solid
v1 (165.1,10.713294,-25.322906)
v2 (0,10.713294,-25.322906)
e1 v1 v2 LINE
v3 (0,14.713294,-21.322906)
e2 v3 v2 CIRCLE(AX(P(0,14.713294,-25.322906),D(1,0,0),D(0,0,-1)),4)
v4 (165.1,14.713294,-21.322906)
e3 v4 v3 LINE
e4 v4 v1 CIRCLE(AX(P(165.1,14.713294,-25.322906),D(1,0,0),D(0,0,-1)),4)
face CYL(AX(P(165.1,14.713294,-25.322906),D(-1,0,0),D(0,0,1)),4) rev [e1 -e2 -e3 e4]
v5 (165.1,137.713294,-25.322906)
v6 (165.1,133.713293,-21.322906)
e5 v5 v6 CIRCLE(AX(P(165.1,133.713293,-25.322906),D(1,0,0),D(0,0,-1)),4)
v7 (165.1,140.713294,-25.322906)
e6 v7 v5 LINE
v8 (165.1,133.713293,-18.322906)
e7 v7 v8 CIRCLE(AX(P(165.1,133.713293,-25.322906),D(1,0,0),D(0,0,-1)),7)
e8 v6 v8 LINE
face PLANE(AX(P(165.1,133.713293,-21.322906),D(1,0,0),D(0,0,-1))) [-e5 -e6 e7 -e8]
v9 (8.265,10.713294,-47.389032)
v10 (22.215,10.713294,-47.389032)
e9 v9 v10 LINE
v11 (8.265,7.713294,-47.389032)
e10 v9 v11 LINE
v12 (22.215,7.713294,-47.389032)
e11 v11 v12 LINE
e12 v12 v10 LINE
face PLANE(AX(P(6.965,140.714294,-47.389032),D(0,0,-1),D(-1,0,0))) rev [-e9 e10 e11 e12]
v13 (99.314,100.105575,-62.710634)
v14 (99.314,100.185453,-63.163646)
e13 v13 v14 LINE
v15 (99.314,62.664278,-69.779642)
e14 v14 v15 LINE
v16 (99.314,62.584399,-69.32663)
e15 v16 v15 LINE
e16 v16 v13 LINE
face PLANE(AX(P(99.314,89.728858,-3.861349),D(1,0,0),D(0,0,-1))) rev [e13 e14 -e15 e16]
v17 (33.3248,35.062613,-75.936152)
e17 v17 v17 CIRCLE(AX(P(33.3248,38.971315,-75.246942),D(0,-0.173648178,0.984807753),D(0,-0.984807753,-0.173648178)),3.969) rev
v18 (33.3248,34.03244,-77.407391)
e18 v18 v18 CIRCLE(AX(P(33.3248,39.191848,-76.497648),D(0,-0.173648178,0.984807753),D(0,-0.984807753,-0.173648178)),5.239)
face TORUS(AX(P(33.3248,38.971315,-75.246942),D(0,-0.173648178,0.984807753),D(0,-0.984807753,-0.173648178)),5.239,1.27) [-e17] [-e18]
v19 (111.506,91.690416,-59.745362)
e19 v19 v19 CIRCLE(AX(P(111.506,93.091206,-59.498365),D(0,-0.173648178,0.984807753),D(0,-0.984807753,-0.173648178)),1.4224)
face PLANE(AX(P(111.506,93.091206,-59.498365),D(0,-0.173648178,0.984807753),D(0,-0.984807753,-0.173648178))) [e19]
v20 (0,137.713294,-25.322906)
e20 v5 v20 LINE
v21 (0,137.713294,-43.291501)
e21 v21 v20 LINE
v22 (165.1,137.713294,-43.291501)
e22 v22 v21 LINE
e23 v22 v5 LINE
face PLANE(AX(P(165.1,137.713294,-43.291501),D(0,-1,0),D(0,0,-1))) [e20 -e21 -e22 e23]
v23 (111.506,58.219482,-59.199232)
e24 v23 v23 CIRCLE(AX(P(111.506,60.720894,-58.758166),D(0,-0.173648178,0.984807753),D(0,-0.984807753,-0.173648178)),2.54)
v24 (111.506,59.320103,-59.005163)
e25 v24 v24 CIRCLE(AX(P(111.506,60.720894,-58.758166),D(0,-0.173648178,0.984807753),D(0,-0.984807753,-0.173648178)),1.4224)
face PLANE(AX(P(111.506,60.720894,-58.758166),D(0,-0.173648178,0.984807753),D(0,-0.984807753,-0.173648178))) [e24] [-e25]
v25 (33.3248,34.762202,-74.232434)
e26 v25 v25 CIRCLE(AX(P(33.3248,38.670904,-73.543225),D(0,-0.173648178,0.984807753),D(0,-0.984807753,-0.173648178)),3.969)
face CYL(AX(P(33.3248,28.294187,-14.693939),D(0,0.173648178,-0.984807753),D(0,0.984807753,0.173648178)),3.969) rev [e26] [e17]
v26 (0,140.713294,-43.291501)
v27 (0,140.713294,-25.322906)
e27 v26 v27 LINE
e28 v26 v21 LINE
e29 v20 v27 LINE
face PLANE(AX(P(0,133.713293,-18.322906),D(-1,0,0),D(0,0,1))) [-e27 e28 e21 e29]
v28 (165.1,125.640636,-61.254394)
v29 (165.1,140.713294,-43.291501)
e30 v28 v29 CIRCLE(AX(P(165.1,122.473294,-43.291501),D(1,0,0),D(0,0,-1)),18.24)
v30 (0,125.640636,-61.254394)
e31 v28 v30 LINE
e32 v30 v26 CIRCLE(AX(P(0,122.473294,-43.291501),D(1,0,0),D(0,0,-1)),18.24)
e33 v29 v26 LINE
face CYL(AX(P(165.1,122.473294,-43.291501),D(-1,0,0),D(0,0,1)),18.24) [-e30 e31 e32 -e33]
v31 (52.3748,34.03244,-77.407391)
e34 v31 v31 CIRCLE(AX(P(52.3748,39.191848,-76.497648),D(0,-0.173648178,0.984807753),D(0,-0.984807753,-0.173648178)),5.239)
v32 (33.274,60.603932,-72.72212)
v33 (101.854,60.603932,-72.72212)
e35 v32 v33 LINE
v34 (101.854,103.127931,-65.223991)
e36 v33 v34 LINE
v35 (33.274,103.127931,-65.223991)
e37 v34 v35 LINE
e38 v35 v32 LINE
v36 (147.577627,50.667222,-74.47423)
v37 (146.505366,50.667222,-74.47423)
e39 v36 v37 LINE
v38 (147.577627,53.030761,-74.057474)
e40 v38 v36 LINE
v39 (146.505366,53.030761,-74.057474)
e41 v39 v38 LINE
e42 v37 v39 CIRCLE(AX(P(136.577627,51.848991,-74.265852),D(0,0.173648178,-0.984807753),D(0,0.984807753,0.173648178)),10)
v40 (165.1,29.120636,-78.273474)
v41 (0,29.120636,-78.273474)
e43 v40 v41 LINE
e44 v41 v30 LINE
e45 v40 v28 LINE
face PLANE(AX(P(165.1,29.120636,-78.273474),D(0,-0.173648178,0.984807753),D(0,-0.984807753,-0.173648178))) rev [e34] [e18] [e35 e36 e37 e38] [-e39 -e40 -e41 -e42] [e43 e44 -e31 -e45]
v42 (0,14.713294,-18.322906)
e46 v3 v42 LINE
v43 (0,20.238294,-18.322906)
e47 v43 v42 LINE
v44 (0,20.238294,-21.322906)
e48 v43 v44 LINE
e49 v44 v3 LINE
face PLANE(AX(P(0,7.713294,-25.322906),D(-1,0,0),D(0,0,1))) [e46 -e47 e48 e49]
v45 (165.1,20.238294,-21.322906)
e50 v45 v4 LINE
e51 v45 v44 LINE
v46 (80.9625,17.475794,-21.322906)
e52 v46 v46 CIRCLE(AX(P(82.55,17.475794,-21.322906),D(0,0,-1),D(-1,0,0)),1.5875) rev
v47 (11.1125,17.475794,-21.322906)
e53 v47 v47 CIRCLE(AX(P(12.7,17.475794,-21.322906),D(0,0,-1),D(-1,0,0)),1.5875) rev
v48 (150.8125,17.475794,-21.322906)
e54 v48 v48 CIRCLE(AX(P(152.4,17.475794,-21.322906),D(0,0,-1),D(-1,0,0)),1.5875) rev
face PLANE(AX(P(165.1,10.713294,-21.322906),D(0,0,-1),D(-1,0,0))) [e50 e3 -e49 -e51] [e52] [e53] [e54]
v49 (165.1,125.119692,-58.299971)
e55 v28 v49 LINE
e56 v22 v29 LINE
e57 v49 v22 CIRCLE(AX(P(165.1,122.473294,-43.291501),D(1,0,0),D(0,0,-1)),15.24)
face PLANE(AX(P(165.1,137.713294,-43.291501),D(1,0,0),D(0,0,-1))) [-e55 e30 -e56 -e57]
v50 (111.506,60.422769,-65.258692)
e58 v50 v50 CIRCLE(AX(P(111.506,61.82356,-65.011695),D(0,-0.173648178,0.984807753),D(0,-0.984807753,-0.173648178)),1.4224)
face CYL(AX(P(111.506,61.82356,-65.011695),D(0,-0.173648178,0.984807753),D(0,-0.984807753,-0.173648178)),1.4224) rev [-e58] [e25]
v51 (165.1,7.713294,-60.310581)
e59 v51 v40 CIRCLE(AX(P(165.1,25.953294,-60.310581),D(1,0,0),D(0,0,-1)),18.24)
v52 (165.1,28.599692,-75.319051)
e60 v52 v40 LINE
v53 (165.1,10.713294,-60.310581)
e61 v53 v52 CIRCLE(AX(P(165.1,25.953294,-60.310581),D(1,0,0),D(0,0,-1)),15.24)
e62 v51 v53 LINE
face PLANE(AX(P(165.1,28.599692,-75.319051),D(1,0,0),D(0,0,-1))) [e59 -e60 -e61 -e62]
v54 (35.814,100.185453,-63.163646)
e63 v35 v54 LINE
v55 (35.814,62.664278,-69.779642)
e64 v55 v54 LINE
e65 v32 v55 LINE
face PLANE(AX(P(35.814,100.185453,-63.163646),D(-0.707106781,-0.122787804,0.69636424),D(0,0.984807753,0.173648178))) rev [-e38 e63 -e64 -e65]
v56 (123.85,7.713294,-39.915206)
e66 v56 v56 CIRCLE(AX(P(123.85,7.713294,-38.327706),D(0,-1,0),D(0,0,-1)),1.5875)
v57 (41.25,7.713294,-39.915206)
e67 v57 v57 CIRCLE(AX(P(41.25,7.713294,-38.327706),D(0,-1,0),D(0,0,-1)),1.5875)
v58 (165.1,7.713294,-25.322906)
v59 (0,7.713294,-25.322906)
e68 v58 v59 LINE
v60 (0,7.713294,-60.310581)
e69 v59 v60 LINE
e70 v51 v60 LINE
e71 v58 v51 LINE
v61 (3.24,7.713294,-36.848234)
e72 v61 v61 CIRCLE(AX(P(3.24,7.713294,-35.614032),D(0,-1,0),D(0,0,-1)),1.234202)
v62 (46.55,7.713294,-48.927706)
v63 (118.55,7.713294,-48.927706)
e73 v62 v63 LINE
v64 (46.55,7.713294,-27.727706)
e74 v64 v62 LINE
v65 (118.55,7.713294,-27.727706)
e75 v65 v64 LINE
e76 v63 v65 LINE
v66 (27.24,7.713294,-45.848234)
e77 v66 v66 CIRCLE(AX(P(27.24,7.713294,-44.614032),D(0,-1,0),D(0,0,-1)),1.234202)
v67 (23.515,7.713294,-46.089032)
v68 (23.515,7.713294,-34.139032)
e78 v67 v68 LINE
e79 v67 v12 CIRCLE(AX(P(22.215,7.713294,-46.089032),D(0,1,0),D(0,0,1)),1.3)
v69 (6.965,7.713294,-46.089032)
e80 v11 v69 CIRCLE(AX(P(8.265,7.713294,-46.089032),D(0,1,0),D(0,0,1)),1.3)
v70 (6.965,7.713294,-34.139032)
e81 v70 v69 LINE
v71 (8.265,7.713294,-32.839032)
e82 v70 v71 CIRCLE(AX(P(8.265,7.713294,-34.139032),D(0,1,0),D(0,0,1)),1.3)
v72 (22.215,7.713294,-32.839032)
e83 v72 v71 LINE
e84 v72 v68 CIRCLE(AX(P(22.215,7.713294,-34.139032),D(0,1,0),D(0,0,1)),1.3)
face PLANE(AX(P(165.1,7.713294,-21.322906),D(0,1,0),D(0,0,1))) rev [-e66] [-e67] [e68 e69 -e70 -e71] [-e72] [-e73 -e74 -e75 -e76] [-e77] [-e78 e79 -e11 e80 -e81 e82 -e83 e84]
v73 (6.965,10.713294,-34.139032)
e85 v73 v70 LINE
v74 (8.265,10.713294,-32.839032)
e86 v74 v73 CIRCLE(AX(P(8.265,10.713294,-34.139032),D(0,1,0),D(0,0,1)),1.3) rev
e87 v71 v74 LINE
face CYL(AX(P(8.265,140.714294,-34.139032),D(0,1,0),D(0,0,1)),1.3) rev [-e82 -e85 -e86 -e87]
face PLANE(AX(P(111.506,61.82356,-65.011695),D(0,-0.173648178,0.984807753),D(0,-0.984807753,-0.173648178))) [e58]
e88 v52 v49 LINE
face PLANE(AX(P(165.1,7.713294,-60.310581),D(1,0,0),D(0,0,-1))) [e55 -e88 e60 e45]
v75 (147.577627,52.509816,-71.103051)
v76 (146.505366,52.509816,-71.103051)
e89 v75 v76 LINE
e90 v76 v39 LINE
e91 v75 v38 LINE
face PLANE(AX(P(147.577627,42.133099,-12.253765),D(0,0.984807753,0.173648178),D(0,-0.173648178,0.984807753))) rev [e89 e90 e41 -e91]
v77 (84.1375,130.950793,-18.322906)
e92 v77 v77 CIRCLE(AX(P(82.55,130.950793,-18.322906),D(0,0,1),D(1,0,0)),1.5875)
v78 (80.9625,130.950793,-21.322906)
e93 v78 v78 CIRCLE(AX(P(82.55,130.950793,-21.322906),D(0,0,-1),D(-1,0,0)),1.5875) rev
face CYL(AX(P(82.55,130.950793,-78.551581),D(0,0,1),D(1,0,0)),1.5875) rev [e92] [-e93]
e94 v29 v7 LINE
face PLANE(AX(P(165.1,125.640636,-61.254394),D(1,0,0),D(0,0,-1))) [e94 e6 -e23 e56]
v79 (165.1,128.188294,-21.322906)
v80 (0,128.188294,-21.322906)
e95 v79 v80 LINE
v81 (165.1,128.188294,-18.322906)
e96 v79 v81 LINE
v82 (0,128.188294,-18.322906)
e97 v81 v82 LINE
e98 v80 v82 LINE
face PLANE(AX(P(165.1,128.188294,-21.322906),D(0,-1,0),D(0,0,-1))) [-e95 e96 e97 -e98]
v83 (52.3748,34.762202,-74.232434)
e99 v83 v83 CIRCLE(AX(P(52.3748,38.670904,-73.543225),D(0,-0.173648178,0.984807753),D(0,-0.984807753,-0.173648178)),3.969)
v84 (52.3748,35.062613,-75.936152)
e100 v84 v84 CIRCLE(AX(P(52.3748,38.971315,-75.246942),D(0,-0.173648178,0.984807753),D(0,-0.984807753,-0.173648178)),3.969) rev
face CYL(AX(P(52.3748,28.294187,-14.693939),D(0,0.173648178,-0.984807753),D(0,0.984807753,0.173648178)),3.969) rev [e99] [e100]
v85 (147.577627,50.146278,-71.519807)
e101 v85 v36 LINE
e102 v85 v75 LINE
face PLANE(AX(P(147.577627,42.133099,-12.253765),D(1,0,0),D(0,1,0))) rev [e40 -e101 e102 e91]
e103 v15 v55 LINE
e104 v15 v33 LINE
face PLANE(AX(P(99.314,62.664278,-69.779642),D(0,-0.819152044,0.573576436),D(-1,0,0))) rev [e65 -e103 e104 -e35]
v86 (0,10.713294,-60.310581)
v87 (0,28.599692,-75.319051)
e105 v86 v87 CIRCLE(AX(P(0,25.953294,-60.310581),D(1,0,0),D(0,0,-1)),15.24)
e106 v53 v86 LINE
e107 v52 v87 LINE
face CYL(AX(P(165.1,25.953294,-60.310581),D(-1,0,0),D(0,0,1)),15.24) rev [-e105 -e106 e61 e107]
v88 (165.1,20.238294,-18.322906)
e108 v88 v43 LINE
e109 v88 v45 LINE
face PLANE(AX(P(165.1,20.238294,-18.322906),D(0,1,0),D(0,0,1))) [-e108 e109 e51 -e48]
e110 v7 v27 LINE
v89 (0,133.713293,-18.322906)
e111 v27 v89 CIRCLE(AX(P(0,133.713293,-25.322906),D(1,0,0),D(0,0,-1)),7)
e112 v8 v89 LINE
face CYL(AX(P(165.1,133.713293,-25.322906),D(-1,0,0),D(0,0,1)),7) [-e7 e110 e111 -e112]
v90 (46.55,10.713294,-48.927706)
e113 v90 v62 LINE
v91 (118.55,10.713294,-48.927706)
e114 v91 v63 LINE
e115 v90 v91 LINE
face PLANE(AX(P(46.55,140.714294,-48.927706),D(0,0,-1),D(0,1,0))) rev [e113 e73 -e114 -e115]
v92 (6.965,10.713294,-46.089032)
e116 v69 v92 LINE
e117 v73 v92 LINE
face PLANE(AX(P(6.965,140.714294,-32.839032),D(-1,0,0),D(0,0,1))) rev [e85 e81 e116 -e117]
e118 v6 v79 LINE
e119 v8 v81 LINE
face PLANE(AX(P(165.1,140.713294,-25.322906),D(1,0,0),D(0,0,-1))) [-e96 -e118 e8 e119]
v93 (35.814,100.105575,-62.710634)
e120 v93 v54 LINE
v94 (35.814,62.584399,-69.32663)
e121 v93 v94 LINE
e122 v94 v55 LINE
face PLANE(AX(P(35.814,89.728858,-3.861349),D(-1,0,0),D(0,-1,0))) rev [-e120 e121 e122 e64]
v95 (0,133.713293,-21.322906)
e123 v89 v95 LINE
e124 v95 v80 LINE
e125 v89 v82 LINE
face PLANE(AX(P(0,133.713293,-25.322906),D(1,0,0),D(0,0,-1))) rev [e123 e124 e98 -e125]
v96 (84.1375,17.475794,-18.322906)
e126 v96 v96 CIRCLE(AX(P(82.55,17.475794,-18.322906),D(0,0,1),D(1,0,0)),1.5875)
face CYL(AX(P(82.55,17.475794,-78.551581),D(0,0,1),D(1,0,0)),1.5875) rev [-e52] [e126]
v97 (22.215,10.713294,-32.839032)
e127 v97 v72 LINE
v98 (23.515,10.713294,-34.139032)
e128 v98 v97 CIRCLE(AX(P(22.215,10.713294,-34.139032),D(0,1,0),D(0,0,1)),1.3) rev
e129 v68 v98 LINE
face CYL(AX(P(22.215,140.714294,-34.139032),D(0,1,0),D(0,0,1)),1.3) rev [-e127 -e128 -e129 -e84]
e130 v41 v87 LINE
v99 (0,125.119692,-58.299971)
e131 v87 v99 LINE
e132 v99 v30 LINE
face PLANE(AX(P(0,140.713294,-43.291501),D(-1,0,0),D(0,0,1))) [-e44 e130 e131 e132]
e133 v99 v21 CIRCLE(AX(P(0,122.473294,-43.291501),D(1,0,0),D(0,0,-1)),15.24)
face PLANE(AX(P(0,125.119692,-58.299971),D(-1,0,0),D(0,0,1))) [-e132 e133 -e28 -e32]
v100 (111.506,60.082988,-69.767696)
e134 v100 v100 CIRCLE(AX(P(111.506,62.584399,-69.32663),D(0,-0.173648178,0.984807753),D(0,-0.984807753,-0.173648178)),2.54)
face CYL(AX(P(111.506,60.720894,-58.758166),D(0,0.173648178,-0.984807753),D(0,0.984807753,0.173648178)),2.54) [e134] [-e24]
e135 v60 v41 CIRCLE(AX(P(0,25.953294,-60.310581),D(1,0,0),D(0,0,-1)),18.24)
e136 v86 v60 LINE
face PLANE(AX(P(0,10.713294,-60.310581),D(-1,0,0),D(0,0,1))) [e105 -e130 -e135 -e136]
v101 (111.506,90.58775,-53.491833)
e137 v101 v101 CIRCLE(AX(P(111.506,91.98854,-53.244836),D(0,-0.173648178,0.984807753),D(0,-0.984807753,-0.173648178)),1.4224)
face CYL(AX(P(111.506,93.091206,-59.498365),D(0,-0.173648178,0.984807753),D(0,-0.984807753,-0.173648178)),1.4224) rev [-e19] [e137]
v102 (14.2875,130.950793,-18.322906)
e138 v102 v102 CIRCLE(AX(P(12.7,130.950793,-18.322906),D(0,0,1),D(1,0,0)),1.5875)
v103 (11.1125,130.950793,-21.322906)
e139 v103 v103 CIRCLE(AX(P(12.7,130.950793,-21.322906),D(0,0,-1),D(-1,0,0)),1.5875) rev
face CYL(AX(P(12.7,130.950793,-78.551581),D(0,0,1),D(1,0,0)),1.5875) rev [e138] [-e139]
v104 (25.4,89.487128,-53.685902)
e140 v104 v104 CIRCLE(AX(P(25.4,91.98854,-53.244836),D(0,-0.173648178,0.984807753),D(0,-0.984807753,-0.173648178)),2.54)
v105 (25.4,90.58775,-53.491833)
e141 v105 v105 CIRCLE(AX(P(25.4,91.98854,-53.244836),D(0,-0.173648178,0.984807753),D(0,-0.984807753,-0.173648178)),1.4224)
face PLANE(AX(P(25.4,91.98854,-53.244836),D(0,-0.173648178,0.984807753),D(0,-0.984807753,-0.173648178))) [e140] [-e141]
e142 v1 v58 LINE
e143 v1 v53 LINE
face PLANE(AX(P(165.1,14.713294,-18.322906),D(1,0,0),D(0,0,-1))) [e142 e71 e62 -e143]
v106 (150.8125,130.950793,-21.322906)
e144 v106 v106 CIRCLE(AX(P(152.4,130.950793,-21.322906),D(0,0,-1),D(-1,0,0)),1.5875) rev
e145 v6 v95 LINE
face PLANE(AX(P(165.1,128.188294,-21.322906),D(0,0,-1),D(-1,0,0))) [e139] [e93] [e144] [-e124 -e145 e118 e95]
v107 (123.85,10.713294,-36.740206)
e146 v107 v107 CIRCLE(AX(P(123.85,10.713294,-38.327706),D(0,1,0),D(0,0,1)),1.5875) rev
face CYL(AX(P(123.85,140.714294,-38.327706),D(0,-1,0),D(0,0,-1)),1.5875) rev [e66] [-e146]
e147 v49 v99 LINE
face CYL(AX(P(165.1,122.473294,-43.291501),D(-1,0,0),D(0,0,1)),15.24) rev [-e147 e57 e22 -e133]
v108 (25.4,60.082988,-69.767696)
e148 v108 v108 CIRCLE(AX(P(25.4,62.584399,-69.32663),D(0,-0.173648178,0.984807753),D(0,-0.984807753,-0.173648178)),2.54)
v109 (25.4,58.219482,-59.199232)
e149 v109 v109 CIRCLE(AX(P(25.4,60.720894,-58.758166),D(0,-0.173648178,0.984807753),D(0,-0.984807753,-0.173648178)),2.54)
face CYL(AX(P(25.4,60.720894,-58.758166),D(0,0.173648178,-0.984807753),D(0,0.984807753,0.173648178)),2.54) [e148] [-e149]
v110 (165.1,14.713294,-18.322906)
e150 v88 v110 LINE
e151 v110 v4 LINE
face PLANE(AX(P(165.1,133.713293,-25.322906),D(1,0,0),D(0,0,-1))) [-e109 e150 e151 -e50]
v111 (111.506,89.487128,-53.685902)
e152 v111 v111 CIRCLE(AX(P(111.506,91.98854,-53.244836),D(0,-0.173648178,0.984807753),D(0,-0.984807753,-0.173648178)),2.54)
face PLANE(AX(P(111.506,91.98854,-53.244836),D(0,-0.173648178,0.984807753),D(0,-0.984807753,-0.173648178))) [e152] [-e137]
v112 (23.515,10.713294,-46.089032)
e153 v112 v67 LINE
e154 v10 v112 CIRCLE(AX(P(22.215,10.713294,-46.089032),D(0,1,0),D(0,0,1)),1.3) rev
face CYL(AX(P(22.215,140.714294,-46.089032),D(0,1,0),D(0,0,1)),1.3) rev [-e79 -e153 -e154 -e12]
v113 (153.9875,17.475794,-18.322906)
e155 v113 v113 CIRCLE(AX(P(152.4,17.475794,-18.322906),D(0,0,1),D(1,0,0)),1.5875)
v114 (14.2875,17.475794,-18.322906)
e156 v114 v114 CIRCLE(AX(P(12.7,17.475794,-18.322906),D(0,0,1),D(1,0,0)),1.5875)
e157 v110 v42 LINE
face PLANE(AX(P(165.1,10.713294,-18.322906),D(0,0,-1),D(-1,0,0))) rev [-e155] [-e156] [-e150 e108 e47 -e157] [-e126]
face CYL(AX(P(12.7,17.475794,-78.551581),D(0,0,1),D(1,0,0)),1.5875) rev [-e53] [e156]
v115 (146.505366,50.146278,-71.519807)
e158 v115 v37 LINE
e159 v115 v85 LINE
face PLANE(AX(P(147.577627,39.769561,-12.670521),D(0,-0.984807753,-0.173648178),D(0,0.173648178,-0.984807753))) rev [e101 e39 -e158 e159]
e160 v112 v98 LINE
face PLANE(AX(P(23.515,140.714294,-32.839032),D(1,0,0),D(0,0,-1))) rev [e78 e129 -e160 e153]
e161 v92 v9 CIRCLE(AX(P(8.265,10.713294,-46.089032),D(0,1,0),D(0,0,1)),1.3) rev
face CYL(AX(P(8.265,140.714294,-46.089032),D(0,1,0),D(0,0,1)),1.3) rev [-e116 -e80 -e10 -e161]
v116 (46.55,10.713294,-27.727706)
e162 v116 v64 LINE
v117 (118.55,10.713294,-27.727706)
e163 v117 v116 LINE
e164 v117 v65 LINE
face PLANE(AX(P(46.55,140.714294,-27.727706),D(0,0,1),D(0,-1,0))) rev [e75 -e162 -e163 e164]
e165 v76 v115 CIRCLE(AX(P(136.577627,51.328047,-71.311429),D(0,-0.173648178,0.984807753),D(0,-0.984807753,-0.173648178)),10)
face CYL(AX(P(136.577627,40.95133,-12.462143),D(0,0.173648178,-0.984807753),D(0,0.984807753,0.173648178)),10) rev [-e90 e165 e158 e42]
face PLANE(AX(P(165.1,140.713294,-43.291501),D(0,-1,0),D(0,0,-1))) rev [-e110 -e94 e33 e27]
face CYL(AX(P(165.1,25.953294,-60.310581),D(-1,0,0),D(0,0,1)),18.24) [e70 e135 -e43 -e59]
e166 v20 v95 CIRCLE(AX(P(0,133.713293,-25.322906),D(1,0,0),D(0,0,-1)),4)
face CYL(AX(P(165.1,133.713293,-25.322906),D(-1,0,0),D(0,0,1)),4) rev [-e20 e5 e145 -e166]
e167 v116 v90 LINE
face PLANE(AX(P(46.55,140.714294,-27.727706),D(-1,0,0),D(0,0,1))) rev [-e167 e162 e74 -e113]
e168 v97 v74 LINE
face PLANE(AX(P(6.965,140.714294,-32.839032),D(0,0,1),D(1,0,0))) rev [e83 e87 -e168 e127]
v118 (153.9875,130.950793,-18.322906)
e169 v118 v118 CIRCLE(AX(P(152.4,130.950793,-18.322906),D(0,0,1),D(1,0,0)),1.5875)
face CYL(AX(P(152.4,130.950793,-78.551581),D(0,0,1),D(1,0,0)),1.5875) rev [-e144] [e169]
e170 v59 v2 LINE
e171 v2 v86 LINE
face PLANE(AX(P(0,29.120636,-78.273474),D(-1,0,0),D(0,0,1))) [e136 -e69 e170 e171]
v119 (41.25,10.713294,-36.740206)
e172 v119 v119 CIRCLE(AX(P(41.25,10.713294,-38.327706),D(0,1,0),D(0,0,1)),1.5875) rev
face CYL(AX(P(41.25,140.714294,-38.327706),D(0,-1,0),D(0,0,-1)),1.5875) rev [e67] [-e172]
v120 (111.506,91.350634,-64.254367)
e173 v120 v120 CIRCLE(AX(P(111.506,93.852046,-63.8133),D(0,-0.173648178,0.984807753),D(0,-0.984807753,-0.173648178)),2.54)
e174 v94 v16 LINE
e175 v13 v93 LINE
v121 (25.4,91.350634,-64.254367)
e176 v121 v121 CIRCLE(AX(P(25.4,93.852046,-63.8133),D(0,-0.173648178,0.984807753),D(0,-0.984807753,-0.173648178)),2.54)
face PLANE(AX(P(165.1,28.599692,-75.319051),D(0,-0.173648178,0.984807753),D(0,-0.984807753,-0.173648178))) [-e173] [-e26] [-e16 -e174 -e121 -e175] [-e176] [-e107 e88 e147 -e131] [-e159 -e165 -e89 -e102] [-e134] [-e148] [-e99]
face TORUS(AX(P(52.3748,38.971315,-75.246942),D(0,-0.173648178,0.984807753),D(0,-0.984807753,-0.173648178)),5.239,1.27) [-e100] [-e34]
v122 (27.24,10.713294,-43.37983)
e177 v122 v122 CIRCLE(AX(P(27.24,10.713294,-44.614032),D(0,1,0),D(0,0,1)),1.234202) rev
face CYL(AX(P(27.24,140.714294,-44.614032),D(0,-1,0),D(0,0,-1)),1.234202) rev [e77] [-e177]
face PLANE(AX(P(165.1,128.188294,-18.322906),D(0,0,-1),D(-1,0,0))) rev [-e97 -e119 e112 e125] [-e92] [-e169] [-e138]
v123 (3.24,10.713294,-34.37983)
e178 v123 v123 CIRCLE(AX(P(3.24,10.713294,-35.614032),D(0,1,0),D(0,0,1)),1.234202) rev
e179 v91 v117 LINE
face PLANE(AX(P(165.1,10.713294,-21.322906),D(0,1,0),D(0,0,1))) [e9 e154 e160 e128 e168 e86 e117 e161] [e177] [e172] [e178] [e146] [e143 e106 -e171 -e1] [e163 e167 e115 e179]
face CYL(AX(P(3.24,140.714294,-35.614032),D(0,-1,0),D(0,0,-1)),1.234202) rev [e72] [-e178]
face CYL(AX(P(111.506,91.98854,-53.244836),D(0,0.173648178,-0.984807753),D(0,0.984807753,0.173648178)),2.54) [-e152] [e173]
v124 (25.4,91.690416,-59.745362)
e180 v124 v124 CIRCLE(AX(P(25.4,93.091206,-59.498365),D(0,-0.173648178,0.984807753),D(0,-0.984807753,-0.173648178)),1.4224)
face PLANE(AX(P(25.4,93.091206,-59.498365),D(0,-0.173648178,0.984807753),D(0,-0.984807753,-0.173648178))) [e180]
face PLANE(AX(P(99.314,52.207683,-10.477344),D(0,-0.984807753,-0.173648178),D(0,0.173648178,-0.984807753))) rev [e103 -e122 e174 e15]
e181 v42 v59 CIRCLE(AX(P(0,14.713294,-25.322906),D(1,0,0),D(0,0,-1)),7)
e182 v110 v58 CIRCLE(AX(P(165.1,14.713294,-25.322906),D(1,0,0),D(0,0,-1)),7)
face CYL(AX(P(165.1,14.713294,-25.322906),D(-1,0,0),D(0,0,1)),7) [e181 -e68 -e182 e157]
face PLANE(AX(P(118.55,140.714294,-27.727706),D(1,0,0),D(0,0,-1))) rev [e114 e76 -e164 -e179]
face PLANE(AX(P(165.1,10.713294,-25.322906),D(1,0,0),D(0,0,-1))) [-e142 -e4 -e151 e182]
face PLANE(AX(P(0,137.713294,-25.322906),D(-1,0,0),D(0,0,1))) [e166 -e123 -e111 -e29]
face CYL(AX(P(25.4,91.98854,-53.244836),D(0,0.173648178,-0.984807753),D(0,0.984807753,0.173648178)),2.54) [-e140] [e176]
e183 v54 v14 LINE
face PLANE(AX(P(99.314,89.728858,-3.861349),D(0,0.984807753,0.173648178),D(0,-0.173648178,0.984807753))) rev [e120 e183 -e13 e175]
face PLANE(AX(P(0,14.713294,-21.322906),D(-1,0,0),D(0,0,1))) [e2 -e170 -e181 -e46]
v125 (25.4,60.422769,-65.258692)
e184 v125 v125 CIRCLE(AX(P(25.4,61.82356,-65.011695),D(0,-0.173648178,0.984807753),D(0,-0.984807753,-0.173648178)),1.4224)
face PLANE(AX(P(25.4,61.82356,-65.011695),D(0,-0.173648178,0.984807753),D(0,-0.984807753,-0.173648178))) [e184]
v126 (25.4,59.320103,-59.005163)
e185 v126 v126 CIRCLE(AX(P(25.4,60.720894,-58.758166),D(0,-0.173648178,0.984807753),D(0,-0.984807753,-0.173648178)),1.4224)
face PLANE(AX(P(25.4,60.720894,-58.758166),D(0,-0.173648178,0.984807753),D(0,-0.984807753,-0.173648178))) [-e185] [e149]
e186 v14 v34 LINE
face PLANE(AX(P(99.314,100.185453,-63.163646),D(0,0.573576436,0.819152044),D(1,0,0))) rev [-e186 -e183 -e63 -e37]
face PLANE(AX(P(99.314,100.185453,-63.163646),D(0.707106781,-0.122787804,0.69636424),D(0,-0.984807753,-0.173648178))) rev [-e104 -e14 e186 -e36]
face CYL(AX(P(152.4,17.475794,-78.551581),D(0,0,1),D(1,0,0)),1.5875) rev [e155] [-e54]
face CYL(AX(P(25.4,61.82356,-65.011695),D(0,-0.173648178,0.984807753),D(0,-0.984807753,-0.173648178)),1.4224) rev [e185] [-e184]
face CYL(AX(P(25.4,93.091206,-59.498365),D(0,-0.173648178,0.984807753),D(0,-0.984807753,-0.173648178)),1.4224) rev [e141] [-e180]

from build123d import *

# Parameters (mm, degrees)
BASE_FLANGE1_DEPTH   = 165.1
SKETCH6_W            = 63.5
SKETCH6_H            = 38.1
CUT_EXTRUDE1_DEPTH   = 218.169427211
CHAMFER1_SIZE        = 2.54
SKETCH8_R            = 2.54
BOSS_EXTRUDE1_DEPTH  = 10.7315
LPATTERN1_COUNT      = 2
LPATTERN1_PITCH      = 31.75
LPATTERN1_COUNT_DIR2 = 2
LPATTERN1_PITCH_DIR2 = 86.106
SKETCH9_R            = 3.969000063
CUT_EXTRUDE2_DEPTH   = 218.169427211
LPATTERN2_COUNT      = 2
LPATTERN2_PITCH      = 19.05
CUT_EXTRUDE3_DEPTH   = 218.169427211
CUT_EXTRUDE5_REACH   = 228.091
SKETCH11_R           = 1.5875
SKETCH11_W           = 72
SKETCH11_H           = 21.2
SKETCH12_R           = 1.5875
CUT_EXTRUDE6_DEPTH   = 3
SKETCH13_R           = 1.234202105
SKETCH13_W           = 16.55
SKETCH13_H           = 14.55
CUT_EXTRUDE7_DEPTH   = 3
FILLET1_R            = 1.3
FILLET2_R            = 1.27
SKETCH14_R           = 1.4224
CUT_EXTRUDE8_DEPTH   = 6.35


# Sheet-metal steps are written as plain solids
with BuildPart() as part:
    # Sketch1 → Base-Flange1 (new body)
    with BuildSketch(Plane(origin=(0, 0, 0), x_dir=(0, 0, -1), z_dir=(1, 0, 0))):
        with BuildLine():
            Line((21.322905549, 20.238293522), (21.322905549, 14.71329365))
            ThreePointArc((21.322905549, 14.71329365), (22.494478461, 11.884866435), (25.322905677, 10.713293522))
            Line((25.322905677, 10.713293522), (60.310580797, 10.713293522))
            ThreePointArc((60.310580797, 10.713293522), (71.985098111, 16.15721035), (75.319050953, 28.59969175))
            Line((75.319050953, 28.59969175), (58.299970775, 125.11969175))
            ThreePointArc((58.299970775, 125.11969175), (53.087583791, 134.147810835), (43.291500619, 137.713293522))
            Line((43.291500619, 137.713293522), (25.322905677, 137.713293522))
            ThreePointArc((25.322905677, 137.713293522), (22.494478461, 136.541720609), (21.322905549, 133.713293394))
            Line((21.322905549, 133.713293394), (21.322905549, 128.188293522))
            Line((21.322905549, 128.188293522), (18.322905549, 128.188293522))
            Line((18.322905549, 128.188293522), (18.322905549, 133.713293394))
            ThreePointArc((18.322905549, 133.713293394), (20.373158118, 138.663040953), (25.322905677, 140.713293522))
            Line((25.322905677, 140.713293522), (43.291500619, 140.713293522))
            ThreePointArc((43.291500619, 140.713293522), (55.01594662, 136.445944164), (61.254394034, 125.640636283))
            Line((61.254394034, 125.640636283), (78.273474212, 29.120636283))
            ThreePointArc((78.273474212, 29.120636283), (74.28323144, 14.228847521), (60.310580797, 7.713293522))
            Line((60.310580797, 7.713293522), (25.322905677, 7.713293522))
            ThreePointArc((25.322905677, 7.713293522), (20.373158118, 9.763546091), (18.322905549, 14.71329365))
            Line((18.322905549, 14.71329365), (18.322905549, 20.238293522))
            Line((18.322905549, 20.238293522), (21.322905549, 20.238293522))
        make_face()
    extrude(amount=BASE_FLANGE1_DEPTH)

    # Sketch6 → Cut-Extrude1 (cut, through all)
    with BuildSketch(Plane(origin=(0, 14.263647062, -80.893162264), x_dir=(-1, 0, 0), z_dir=(0, 0.1736481776669347, -0.9848077530122075))):
        with Locations((-67.564, 68.645158806)):
            Rectangle(SKETCH6_W, SKETCH6_H)
    extrude(amount=-CUT_EXTRUDE1_DEPTH, mode=Mode.SUBTRACT)

    # Chamfer1
    chamfer1_edges = [part.edges().sort_by_distance(p)[0] for p in [
        (99.314, 81.865931661, -68.973055532),
        (67.564, 63.105343966, -72.281053316),
        (35.814, 81.865931661, -68.973055532),
        (67.564, 100.626519356, -65.665057747),
    ]]
    chamfer(chamfer1_edges, length=CHAMFER1_SIZE)

    # Sketch8 → Boss-Extrude1 (add)
    with BuildSketch(Plane(origin=(0, 13.742702529, -77.938739005), x_dir=(1, 0, 0), z_dir=(0, -0.1736481776669347, 0.9848077530122075))):
        with Locations(Location((25.4, 49.595158806, 0), (0, 0, 270))):
            Circle(SKETCH8_R)
    boss_extrude1 = extrude(amount=BOSS_EXTRUDE1_DEPTH)

    # LPattern1: Boss-Extrude1 2 × 2
    with Locations(*[Vector(0, 0.9848077530122074, 0.17364817766693458) * (i * LPATTERN1_PITCH) + Vector(1, 0, 0) * (j * LPATTERN1_PITCH_DIR2) for i in range(LPATTERN1_COUNT) for j in range(LPATTERN1_COUNT_DIR2) if (i, j) != (0, 0)]):
        add(boss_extrude1)

    # Sketch9 → Cut-Extrude2 (cut, through all)
    with BuildSketch(Plane(origin=(0, 14.263647062, -80.893162264), x_dir=(-1, 0, 0), z_dir=(0, 0.1736481776669347, -0.9848077530122075))):
        with Locations(Location((-52.3748, 25.312758806, 0), (0, 0, 90))):
            Circle(SKETCH9_R)
    cut_extrude2 = extrude(amount=-CUT_EXTRUDE2_DEPTH, mode=Mode.SUBTRACT)

    # LPattern2: Cut-Extrude2 ×2
    with Locations(*[(-i * LPATTERN2_PITCH, 0, 0) for i in range(1, LPATTERN2_COUNT)]):
        add(cut_extrude2, mode=Mode.SUBTRACT)

    # Sketch10 → Cut-Extrude3 (cut, through all)
    with BuildSketch(Plane(origin=(0, 14.263647062, -80.893162264), x_dir=(-1, 0, 0), z_dir=(0, 0.17364817766693483, -0.9848077530122072))):
        with BuildLine():
            Line((-147.577626964, 39.365158806), (-147.577626964, 36.965158806))
            Line((-147.577626964, 36.965158806), (-146.505365759, 36.965158806))
            ThreePointArc((-146.505365759, 36.965158806), (-126.577626964, 38.165158806), (-146.505365759, 39.365158806))
            Line((-146.505365759, 39.365158806), (-147.577626964, 39.365158806))
        make_face()
    extrude(amount=-CUT_EXTRUDE3_DEPTH, mode=Mode.SUBTRACT)

    # Sketch11 → Cut-Extrude5 (cut, up to next)
    with BuildSketch(Plane(origin=(0, 7.713293522, 0), x_dir=(-1, 0, 0), z_dir=(0, -1, 0)), mode=Mode.PRIVATE) as cut_extrude5_sk1:
        with Locations(Location((-41.25, 38.327705677, 0), (0, 0, 90))):
            Circle(SKETCH11_R)
    cut_extrude5_tool1 = extrude(cut_extrude5_sk1.sketch, amount=-CUT_EXTRUDE5_REACH, mode=Mode.PRIVATE) & part.part
    # Sketch11 → Cut-Extrude5 (cut, up to next)
    with BuildSketch(Plane(origin=(0, 7.713293522, 0), x_dir=(-1, 0, 0), z_dir=(0, -1, 0)), mode=Mode.PRIVATE) as cut_extrude5_sk2:
        with Locations(Location((-123.85, 38.327705677, 0), (0, 0, 90))):
            Circle(SKETCH11_R)
    cut_extrude5_tool2 = extrude(cut_extrude5_sk2.sketch, amount=-CUT_EXTRUDE5_REACH, mode=Mode.PRIVATE) & part.part
    # Sketch11 → Cut-Extrude5 (cut, up to next)
    with BuildSketch(Plane(origin=(0, 7.713293522, 0), x_dir=(-1, 0, 0), z_dir=(0, -1, 0)), mode=Mode.PRIVATE) as cut_extrude5_sk3:
        with Locations((-82.55, 38.327705677)):
            Rectangle(SKETCH11_W, SKETCH11_H)
    cut_extrude5_tool3 = extrude(cut_extrude5_sk3.sketch, amount=-CUT_EXTRUDE5_REACH, mode=Mode.PRIVATE) & part.part
    add(cut_extrude5_tool1.solids().sort_by_distance((41.25, 7.713294, -38.327706))[0], mode=Mode.SUBTRACT)
    add(cut_extrude5_tool2.solids().sort_by_distance((123.85, 7.713294, -38.327706))[0], mode=Mode.SUBTRACT)
    add(cut_extrude5_tool3.solids().sort_by_distance((82.55, 7.713294, -38.327706))[0], mode=Mode.SUBTRACT)

    # Sketch12 → Cut-Extrude6 (cut)
    with BuildSketch(Plane.XY.offset(-18.322905549)):
        with Locations((152.4, 130.950793458)):
            Circle(SKETCH12_R)
        with Locations((152.4, 17.475793586)):
            Circle(SKETCH12_R)
        with Locations((82.55, 17.475793586)):
            Circle(SKETCH12_R)
        with Locations((82.55, 130.950793458)):
            Circle(SKETCH12_R)
        with Locations((12.7, 130.950793458)):
            Circle(SKETCH12_R)
        with Locations((12.7, 17.475793586)):
            Circle(SKETCH12_R)
    extrude(amount=-CUT_EXTRUDE6_DEPTH, mode=Mode.SUBTRACT)

    # Sketch13 → Cut-Extrude7 (cut)
    with BuildSketch(Plane(origin=(0, 7.713293522, 0), x_dir=(-1, 0, 0), z_dir=(0, -1, 0))):
        with Locations(Location((-3.24, 35.61403221, 0), (0, 0, 90))):
            Circle(SKETCH13_R)
        with Locations(Location((-27.24, 44.61403221, 0), (0, 0, 90))):
            Circle(SKETCH13_R)
        with Locations((-15.24, 40.11403221)):
            Rectangle(SKETCH13_W, SKETCH13_H)
    extrude(amount=-CUT_EXTRUDE7_DEPTH, mode=Mode.SUBTRACT)

    # Fillet1
    fillet1_edges = [part.edges().sort_by_distance(p)[0] for p in [
        (6.965, 9.213293522, -47.38903221),
        (6.965, 9.213293522, -32.83903221),
        (23.515, 9.213293522, -32.83903221),
        (23.515, 9.213293522, -47.38903221),
    ]]
    fillet(fillet1_edges, radius=FILLET1_R)

    # Fillet2
    fillet2_edges = [part.edges().sort_by_distance(p)[0] for p in [
        (52.3748, 35.283146151, -77.186857454),
        (33.3248, 35.283146151, -77.186857454),
    ]]
    fillet(fillet2_edges, radius=FILLET2_R)

    # Sketch14 → Cut-Extrude8 (cut)
    with BuildSketch(Plane(origin=(0, 11.87919711, -67.370274604), x_dir=(1, 0, 0), z_dir=(0, -0.17364817766693477, 0.9848077530122074))):
        with Locations(Location((111.506, 81.345158806, 0), (0, 0, 270))):
            Circle(SKETCH14_R)
        with Locations(Location((111.506, 49.595158806, 0), (0, 0, 270))):
            Circle(SKETCH14_R)
        with Locations(Location((25.4, 49.595158806, 0), (0, 0, 270))):
            Circle(SKETCH14_R)
        with Locations(Location((25.4, 81.345158806, 0), (0, 0, 270))):
            Circle(SKETCH14_R)
    extrude(amount=-CUT_EXTRUDE8_DEPTH, mode=Mode.SUBTRACT)


solid = part.part
